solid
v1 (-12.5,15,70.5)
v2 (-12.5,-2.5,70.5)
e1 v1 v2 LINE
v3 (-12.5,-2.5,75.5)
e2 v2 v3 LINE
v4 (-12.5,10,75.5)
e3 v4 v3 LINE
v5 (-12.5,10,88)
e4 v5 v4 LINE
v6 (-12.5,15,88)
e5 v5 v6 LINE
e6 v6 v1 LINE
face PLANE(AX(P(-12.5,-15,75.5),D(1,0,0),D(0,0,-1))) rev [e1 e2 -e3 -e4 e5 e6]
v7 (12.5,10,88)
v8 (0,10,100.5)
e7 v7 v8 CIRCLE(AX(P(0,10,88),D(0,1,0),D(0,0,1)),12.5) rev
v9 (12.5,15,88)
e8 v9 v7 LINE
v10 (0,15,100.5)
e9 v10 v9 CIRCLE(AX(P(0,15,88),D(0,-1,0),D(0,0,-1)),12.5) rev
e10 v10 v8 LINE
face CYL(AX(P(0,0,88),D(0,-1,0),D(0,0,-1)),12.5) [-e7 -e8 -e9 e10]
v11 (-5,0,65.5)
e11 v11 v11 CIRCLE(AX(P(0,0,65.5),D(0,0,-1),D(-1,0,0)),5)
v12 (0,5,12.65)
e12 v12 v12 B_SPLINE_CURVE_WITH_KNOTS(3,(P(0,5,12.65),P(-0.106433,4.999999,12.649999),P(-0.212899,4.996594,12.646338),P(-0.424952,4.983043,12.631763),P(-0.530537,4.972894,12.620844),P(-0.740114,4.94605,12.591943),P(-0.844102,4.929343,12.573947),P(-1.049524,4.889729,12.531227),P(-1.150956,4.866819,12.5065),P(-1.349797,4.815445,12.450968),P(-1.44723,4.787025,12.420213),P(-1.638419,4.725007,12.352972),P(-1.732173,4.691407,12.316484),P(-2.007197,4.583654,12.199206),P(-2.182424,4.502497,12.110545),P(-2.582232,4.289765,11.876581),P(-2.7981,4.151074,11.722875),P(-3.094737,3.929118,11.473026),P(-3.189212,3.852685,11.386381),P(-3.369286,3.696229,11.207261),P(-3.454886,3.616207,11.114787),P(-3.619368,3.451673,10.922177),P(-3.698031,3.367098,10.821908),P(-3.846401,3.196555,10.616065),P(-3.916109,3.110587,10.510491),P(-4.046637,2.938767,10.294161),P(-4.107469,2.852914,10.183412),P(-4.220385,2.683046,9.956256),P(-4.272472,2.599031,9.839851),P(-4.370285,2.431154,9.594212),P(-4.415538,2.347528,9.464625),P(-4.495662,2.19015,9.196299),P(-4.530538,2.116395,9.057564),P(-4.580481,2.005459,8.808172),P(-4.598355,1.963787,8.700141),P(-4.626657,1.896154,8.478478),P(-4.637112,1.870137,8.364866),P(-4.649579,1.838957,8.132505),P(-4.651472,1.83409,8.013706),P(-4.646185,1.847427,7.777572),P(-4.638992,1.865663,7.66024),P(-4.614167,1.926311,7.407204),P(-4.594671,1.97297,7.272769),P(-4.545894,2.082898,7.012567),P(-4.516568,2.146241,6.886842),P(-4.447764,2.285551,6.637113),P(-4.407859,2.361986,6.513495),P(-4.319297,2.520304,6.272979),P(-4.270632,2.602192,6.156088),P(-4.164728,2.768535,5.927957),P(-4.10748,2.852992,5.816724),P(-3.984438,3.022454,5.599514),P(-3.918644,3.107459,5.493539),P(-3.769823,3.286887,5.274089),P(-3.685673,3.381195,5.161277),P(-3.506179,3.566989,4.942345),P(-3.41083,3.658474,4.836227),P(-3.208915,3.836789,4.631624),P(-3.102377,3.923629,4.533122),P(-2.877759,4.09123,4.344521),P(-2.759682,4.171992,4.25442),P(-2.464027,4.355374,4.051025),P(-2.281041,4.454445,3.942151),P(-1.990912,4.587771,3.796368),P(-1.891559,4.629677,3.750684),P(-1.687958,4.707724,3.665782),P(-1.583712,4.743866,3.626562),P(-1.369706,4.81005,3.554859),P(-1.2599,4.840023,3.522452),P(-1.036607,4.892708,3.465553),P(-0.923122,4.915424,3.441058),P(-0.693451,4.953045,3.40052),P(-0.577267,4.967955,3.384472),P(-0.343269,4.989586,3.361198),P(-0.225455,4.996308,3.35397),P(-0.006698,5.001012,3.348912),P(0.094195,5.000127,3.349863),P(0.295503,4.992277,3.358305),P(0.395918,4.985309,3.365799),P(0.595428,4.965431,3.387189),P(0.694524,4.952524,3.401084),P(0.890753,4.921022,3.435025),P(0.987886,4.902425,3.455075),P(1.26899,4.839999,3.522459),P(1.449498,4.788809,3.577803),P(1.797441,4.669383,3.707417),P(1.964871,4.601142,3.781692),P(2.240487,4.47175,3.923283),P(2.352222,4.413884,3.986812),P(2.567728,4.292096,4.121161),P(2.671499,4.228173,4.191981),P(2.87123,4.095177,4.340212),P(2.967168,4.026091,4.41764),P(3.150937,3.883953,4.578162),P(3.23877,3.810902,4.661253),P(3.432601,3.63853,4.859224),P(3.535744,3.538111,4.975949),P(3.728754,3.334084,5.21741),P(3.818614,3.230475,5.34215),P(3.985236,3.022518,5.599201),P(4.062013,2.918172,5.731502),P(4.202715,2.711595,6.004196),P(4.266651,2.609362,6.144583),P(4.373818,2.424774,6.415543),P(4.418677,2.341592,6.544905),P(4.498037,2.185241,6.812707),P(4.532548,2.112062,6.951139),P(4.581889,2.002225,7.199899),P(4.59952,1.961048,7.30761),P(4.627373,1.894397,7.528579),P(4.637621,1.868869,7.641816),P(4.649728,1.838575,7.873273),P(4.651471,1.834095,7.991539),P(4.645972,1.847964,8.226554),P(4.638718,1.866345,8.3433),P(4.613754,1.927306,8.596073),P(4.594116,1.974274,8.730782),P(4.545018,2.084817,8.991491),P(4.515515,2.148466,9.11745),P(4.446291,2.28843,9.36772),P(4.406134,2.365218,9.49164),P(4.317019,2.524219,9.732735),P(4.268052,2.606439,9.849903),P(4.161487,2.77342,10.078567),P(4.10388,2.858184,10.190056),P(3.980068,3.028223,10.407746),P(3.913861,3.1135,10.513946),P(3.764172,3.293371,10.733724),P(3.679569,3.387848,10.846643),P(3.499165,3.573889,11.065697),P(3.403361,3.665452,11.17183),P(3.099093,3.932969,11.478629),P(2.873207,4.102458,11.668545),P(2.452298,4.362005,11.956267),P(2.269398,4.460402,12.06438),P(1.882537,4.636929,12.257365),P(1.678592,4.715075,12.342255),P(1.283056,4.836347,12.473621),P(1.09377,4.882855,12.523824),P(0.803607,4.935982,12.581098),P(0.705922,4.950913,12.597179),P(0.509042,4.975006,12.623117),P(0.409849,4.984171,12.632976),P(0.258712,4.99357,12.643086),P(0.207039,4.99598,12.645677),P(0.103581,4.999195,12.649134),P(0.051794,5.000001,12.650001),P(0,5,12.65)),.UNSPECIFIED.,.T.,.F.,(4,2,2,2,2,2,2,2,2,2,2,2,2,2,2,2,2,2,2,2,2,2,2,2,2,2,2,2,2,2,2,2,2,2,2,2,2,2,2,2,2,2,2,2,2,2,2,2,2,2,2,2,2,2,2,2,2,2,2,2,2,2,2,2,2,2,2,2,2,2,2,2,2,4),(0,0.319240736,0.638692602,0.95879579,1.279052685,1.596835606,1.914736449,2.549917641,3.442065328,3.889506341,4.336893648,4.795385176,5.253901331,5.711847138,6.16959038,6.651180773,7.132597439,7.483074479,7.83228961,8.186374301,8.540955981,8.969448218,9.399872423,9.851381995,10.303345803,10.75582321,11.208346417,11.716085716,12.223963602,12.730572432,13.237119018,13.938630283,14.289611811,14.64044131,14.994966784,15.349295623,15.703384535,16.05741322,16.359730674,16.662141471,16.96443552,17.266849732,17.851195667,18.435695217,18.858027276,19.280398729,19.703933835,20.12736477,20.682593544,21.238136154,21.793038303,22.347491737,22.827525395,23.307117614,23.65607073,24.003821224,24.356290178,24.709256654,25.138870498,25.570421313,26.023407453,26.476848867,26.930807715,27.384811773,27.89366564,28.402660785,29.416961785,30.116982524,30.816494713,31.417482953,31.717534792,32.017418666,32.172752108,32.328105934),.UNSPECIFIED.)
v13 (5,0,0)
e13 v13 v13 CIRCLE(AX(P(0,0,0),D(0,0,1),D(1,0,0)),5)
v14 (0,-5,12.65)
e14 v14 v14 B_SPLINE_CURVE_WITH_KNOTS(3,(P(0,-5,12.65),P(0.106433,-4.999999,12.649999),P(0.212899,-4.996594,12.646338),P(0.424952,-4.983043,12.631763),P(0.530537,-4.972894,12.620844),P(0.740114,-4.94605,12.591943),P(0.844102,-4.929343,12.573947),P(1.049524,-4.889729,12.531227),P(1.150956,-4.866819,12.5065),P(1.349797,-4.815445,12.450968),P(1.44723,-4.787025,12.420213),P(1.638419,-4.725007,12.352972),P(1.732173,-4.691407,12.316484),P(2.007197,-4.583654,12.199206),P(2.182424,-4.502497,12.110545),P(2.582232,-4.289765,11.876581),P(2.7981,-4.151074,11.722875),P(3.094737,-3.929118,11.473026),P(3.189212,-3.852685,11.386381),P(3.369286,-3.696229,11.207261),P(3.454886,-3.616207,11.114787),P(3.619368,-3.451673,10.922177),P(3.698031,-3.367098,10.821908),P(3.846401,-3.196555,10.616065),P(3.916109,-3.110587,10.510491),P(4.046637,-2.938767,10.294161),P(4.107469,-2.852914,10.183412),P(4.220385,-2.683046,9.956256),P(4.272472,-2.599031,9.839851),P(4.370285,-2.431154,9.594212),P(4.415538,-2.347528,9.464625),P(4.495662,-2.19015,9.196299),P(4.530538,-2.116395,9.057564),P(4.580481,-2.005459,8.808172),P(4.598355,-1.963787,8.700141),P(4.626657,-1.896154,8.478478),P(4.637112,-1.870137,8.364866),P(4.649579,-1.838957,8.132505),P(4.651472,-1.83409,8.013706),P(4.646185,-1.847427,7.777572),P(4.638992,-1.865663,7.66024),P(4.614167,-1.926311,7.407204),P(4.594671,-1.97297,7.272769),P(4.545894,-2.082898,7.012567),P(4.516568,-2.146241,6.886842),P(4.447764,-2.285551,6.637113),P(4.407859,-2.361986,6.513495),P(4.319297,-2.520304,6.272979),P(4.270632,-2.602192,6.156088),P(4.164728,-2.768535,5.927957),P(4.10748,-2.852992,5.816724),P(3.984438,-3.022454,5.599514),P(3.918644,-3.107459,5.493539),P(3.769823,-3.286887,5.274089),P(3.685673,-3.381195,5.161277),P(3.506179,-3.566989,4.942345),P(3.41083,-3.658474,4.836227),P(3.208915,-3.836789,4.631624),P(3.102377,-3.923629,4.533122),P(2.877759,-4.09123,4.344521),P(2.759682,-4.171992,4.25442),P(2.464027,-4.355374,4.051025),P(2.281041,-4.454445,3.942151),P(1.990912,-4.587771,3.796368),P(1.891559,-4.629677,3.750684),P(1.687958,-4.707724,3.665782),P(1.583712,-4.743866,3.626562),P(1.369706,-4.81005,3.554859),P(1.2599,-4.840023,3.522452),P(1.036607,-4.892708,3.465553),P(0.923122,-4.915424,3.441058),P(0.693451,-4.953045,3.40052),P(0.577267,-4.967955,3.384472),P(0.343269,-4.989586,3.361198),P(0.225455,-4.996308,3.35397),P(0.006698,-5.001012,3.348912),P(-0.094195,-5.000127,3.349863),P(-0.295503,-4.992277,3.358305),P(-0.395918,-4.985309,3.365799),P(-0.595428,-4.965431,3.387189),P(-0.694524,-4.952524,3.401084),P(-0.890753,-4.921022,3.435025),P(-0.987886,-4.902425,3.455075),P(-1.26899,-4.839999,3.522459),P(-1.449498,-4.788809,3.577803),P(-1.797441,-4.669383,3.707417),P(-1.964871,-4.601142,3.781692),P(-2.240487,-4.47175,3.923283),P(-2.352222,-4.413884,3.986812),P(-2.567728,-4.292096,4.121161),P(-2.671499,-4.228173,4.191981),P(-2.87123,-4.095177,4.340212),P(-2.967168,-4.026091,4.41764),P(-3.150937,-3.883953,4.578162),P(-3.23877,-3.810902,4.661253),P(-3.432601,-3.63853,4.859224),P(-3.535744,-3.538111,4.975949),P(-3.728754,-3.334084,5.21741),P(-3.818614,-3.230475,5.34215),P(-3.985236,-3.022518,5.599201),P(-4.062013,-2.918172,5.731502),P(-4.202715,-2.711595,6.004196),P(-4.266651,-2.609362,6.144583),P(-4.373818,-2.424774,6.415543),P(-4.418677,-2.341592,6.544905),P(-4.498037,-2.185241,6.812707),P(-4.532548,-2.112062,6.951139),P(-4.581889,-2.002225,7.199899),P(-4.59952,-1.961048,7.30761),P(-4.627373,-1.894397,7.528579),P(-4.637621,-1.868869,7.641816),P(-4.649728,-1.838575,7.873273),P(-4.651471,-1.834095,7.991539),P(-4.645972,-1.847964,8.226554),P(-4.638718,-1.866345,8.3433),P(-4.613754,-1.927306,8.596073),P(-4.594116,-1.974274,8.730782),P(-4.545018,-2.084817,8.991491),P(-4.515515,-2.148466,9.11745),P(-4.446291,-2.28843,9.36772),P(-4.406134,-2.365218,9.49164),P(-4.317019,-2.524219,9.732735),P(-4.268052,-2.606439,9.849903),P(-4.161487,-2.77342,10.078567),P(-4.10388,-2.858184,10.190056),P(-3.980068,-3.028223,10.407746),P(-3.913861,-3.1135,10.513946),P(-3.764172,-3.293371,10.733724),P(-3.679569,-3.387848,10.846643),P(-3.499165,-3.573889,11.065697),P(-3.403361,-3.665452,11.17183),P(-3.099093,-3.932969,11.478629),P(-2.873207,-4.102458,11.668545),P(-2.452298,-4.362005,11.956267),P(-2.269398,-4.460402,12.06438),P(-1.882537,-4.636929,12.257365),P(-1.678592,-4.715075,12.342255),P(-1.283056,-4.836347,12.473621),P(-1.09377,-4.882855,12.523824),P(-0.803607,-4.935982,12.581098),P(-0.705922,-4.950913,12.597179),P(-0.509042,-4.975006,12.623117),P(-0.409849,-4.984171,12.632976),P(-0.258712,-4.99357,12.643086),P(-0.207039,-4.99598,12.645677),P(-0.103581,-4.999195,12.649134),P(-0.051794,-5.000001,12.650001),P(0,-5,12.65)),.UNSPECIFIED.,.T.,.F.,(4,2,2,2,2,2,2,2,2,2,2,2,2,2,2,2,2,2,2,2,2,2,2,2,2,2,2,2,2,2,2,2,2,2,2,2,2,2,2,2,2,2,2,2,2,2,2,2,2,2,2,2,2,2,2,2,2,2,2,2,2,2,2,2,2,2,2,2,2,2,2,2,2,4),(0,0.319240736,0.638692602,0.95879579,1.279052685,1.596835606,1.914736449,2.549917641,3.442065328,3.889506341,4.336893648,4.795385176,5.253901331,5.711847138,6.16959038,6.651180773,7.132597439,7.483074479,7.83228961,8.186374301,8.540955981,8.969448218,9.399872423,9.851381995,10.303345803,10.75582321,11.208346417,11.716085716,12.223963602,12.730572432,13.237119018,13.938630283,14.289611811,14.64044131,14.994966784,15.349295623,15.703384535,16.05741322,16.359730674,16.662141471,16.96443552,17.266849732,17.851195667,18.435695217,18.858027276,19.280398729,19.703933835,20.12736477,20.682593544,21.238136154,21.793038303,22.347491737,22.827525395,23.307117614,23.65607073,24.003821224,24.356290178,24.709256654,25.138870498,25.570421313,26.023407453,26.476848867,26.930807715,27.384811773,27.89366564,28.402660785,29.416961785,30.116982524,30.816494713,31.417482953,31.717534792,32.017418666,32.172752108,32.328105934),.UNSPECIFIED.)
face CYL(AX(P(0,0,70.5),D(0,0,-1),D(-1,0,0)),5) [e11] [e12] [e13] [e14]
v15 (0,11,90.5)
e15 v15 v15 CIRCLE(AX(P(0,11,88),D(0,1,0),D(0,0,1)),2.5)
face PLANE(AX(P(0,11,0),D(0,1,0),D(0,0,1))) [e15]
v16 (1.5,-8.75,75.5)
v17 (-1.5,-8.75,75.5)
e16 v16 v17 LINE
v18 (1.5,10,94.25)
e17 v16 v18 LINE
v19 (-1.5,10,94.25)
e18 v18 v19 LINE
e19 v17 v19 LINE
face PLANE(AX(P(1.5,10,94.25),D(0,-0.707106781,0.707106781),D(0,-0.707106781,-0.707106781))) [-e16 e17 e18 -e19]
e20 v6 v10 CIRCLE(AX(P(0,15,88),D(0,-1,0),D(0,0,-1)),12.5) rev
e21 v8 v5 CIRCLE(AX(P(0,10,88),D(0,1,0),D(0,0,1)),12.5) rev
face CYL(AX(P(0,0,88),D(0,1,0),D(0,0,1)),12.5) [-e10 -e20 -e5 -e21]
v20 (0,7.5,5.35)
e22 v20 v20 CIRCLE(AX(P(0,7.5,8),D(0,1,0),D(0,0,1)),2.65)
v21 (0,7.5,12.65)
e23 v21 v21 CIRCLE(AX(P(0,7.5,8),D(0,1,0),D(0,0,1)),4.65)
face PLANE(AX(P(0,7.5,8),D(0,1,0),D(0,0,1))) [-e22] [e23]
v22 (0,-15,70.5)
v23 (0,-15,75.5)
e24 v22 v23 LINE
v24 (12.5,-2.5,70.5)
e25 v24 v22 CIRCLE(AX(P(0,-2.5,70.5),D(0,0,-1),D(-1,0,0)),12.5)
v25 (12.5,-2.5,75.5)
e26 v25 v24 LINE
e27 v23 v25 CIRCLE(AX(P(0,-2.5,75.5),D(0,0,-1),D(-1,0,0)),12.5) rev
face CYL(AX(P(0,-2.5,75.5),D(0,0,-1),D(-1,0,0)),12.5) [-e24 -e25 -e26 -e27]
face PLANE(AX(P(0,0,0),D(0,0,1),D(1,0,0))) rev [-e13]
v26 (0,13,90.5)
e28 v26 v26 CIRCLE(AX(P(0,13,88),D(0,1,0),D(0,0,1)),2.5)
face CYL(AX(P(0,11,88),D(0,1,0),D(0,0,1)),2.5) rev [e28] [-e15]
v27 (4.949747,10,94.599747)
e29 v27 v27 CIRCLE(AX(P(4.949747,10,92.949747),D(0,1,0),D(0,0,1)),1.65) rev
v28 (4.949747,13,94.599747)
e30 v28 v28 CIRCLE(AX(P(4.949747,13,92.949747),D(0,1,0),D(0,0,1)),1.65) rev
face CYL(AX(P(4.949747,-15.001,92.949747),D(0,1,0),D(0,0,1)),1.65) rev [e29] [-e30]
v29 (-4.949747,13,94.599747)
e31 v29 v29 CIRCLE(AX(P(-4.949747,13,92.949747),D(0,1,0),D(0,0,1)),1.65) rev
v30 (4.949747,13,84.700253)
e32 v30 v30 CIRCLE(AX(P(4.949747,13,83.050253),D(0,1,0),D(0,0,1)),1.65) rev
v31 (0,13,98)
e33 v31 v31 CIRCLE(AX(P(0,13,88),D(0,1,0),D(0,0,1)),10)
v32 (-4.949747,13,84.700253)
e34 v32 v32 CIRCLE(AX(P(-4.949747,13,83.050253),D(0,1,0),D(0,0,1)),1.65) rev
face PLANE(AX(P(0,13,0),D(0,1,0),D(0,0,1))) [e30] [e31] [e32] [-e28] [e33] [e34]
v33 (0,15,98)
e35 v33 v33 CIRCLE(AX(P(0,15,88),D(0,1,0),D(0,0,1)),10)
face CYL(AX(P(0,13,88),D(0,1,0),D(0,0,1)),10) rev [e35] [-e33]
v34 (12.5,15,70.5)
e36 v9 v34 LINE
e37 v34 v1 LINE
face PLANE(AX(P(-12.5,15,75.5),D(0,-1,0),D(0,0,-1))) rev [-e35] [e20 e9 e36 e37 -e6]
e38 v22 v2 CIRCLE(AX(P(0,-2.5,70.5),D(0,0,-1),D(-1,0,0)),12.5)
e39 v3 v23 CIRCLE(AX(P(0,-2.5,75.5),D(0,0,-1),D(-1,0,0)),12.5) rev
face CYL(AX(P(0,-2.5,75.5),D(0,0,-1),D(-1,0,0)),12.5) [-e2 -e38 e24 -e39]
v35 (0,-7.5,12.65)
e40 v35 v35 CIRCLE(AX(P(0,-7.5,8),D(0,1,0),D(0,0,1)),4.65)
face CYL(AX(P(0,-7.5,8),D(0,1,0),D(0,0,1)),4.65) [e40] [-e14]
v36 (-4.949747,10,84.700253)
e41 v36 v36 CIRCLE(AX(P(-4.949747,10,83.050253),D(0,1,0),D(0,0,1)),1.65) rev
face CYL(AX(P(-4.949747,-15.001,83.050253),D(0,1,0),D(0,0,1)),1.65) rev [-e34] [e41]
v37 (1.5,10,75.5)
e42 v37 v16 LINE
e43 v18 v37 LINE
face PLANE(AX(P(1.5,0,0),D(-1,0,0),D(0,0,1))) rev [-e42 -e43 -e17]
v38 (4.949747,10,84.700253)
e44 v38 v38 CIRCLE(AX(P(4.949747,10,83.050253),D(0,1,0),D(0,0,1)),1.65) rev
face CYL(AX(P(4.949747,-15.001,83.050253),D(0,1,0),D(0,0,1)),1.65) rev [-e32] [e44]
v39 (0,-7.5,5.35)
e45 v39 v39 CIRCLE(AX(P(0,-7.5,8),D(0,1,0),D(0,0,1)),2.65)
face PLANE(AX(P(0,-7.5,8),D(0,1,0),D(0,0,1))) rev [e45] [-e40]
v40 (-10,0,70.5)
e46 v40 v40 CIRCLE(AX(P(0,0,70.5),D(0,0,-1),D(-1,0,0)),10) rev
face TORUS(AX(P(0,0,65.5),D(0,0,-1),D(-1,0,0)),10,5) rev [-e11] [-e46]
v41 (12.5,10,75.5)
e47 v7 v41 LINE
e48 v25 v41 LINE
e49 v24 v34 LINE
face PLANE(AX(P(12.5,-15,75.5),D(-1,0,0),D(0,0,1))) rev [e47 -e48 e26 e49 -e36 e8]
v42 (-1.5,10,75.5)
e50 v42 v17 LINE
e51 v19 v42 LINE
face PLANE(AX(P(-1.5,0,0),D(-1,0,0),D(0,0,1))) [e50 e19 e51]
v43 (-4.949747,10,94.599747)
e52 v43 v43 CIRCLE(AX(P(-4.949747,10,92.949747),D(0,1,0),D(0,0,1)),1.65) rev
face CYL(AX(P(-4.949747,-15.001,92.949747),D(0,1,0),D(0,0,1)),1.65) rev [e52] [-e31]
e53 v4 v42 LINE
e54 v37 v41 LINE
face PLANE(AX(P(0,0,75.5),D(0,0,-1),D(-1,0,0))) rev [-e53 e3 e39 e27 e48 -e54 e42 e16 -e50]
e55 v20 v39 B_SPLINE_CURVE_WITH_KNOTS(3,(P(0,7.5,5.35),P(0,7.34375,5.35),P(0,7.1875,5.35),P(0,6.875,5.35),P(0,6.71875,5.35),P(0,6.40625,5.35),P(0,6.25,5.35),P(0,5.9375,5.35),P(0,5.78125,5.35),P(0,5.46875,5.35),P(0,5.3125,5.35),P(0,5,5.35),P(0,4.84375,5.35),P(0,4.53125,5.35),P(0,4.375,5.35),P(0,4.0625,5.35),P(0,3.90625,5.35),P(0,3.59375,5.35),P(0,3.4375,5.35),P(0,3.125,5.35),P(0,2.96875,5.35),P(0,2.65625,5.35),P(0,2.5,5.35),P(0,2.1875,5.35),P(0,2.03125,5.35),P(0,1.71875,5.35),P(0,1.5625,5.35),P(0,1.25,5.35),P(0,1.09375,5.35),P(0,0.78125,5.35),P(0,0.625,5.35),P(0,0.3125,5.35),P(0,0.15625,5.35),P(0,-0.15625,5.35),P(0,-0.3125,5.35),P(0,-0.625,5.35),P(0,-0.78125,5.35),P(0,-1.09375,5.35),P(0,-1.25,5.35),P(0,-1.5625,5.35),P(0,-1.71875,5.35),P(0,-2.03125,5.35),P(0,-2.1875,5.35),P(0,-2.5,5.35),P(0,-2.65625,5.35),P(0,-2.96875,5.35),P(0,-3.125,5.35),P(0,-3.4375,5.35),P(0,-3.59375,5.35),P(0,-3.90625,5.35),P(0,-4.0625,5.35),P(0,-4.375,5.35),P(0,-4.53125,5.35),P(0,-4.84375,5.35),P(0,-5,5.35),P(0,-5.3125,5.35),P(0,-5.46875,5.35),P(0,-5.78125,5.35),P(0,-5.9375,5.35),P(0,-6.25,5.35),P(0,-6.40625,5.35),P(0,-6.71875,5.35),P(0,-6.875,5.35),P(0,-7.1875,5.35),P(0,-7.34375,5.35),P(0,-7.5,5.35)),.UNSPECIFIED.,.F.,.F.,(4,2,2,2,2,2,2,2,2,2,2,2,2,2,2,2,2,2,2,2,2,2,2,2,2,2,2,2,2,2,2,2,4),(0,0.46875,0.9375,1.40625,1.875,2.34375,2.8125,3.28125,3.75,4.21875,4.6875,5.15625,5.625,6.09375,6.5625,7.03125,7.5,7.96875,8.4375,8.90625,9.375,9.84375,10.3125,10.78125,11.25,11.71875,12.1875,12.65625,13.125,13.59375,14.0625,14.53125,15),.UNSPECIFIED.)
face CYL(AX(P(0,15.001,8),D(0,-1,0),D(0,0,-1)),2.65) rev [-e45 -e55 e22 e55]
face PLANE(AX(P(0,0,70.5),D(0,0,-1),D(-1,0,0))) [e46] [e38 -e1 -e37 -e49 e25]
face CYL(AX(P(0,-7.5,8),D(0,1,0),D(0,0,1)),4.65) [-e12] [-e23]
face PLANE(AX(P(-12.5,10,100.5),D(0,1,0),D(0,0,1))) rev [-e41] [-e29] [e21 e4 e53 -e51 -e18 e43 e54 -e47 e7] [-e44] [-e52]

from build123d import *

# Parameters (mm, degrees)
SKETCH1_R                           = 5
BOSS_EXTRUDE1_DEPTH                 = 70.5
SKETCH3_W                           = 25
SKETCH3_H                           = 30
BOSS_EXTRUDE3_DEPTH                 = 5
SKETCH4_W                           = 25
SKETCH4_H                           = 5
BOSS_EXTRUDE4_DEPTH                 = 25
FILLET3_R                           = 12.5
CUT_EXTRUDE1_REACH                  = 107.624
SKETCH6_R                           = 1.65
SKETCH6_3_R                         = 10
SKETCH6_3_R_2                       = 1.65
SKETCH6_3_R_3                       = 2.5
CUT_EXTRUDE2_DEPTH                  = 2
SKETCH6_4_R                         = 2.5
CUT_EXTRUDE3_DEPTH                  = 4
FILLET4_R                           = 5
CUT_EXTRUDE4_REACH                  = 104.379
CUT_EXTRUDE4_END_RADIUS             = 5
SKETCH7_R                           = 2.65
CUT_EXTRUDE4_DIRECTION_2_REACH      = 104.379
CUT_EXTRUDE4_DIRECTION_2_END_RADIUS = 5
BOSS_EXTRUDE6_DEPTH                 = 7.5
BOSS_EXTRUDE6_DEPTH_BACK            = 7.5
SKETCH7_3_R                         = 4.65
SKETCH7_3_R_2                       = 2.65
BOSS_EXTRUDE7_DEPTH                 = 1.5
BOSS_EXTRUDE7_DEPTH_BACK            = 1.5


with BuildPart() as part:
    # Sketch1 → Boss-Extrude1 (new body)
    with BuildSketch(Plane(origin=(0, 0, 0), x_dir=(0, 1, 0), z_dir=(0, 0, 1))):
        with Locations(Location((0, 0, 0), (0, 0, 270))):
            Circle(SKETCH1_R)
    extrude(amount=BOSS_EXTRUDE1_DEPTH)

    # Sketch3 → Boss-Extrude3 (add)
    with BuildSketch(Plane.XY.offset(70.5)):
        Rectangle(SKETCH3_W, SKETCH3_H)
    extrude(amount=BOSS_EXTRUDE3_DEPTH)

    # Sketch4 → Boss-Extrude4 (add)
    with BuildSketch(Plane.XY.offset(75.5)):
        with Locations((0, 12.5)):
            Rectangle(SKETCH4_W, SKETCH4_H)
    extrude(amount=BOSS_EXTRUDE4_DEPTH)

    # Fillet3
    fillet3_edges = [part.edges().sort_by_distance(p)[0] for p in [
        (12.5, 12.5, 100.5),
        (-12.5, 12.5, 100.5),
        (-12.5, -15, 73),
        (12.5, -15, 73),
    ]]
    fillet(fillet3_edges, radius=FILLET3_R - 0.0001)  # a hair under: the kernel refuses the full size

    # Sketch6 → Cut-Extrude1 (cut, up to next)
    with BuildSketch(Plane(origin=(0, 15, 0), x_dir=(-1, 0, 0), z_dir=(0, 1, 0)), mode=Mode.PRIVATE) as cut_extrude1_sk1:
        with Locations(Location((-4.949747468, 92.949747468, 0), (0, 0, 90))):
            Circle(SKETCH6_R)
    cut_extrude1_tool1 = extrude(cut_extrude1_sk1.sketch, amount=-CUT_EXTRUDE1_REACH, mode=Mode.PRIVATE) & part.part
    # Sketch6 → Cut-Extrude1 (cut, up to next)
    with BuildSketch(Plane(origin=(0, 15, 0), x_dir=(-1, 0, 0), z_dir=(0, 1, 0)), mode=Mode.PRIVATE) as cut_extrude1_sk2:
        with Locations(Location((4.949747468, 92.949747468, 0), (0, 0, 90))):
            Circle(SKETCH6_R)
    cut_extrude1_tool2 = extrude(cut_extrude1_sk2.sketch, amount=-CUT_EXTRUDE1_REACH, mode=Mode.PRIVATE) & part.part
    # Sketch6 → Cut-Extrude1 (cut, up to next)
    with BuildSketch(Plane(origin=(0, 15, 0), x_dir=(-1, 0, 0), z_dir=(0, 1, 0)), mode=Mode.PRIVATE) as cut_extrude1_sk3:
        with Locations(Location((-4.949747468, 83.050252532, 0), (0, 0, 90))):
            Circle(SKETCH6_R)
    cut_extrude1_tool3 = extrude(cut_extrude1_sk3.sketch, amount=-CUT_EXTRUDE1_REACH, mode=Mode.PRIVATE) & part.part
    # Sketch6 → Cut-Extrude1 (cut, up to next)
    with BuildSketch(Plane(origin=(0, 15, 0), x_dir=(-1, 0, 0), z_dir=(0, 1, 0)), mode=Mode.PRIVATE) as cut_extrude1_sk4:
        with Locations(Location((4.949747468, 83.050252532, 0), (0, 0, 90))):
            Circle(SKETCH6_R)
    cut_extrude1_tool4 = extrude(cut_extrude1_sk4.sketch, amount=-CUT_EXTRUDE1_REACH, mode=Mode.PRIVATE) & part.part
    add(cut_extrude1_tool1.solids().sort_by_distance((4.949747, 15, 92.949747))[0], mode=Mode.SUBTRACT)
    add(cut_extrude1_tool2.solids().sort_by_distance((-4.949747, 15, 92.949747))[0], mode=Mode.SUBTRACT)
    add(cut_extrude1_tool3.solids().sort_by_distance((4.949747, 15, 83.050253))[0], mode=Mode.SUBTRACT)
    add(cut_extrude1_tool4.solids().sort_by_distance((-4.949747, 15, 83.050253))[0], mode=Mode.SUBTRACT)

    # Sketch6<3> → Cut-Extrude2 (cut)
    # profile 1 of 6: a face of its own
    with BuildSketch(Plane(origin=(0, 15, 0), x_dir=(-1, 0, 0), z_dir=(0, 1, 0))):
        with Locations(Location((0, 88, 0), (0, 0, 90))):
            Circle(SKETCH6_3_R)
        with Locations(Location((4.949747468, 83.050252532, 0), (0, 0, 90))):
            Circle(SKETCH6_3_R_2, mode=Mode.SUBTRACT)
        with Locations(Location((-4.949747468, 83.050252532, 0), (0, 0, 90))):
            Circle(SKETCH6_3_R_2, mode=Mode.SUBTRACT)
        with Locations(Location((4.949747468, 92.949747468, 0), (0, 0, 90))):
            Circle(SKETCH6_3_R_2, mode=Mode.SUBTRACT)
        with Locations(Location((-4.949747468, 92.949747468, 0), (0, 0, 90))):
            Circle(SKETCH6_3_R_2, mode=Mode.SUBTRACT)
        with Locations((0, 88)):
            Circle(SKETCH6_3_R_3, mode=Mode.SUBTRACT)
    # profile 2 of 6: a face of its own
    with BuildSketch(Plane(origin=(0, 15, 0), x_dir=(-1, 0, 0), z_dir=(0, 1, 0))):
        with Locations(Location((4.949747468, 92.949747468, 0), (0, 0, 90))):
            Circle(SKETCH6_3_R_2)
    # profile 3 of 6: a face of its own
    with BuildSketch(Plane(origin=(0, 15, 0), x_dir=(-1, 0, 0), z_dir=(0, 1, 0))):
        with Locations(Location((-4.949747468, 92.949747468, 0), (0, 0, 90))):
            Circle(SKETCH6_3_R_2)
    # profile 4 of 6: a face of its own
    with BuildSketch(Plane(origin=(0, 15, 0), x_dir=(-1, 0, 0), z_dir=(0, 1, 0))):
        with Locations(Location((-4.949747468, 83.050252532, 0), (0, 0, 90))):
            Circle(SKETCH6_3_R_2)
    # profile 5 of 6: a face of its own
    with BuildSketch(Plane(origin=(0, 15, 0), x_dir=(-1, 0, 0), z_dir=(0, 1, 0))):
        with Locations(Location((4.949747468, 83.050252532, 0), (0, 0, 90))):
            Circle(SKETCH6_3_R_2)
    # profile 6 of 6: a face of its own
    with BuildSketch(Plane(origin=(0, 15, 0), x_dir=(-1, 0, 0), z_dir=(0, 1, 0))):
        with Locations((0, 88)):
            Circle(SKETCH6_3_R_3)
    extrude(amount=-CUT_EXTRUDE2_DEPTH, mode=Mode.SUBTRACT)

    # Sketch6<4> → Cut-Extrude3 (cut)
    with BuildSketch(Plane(origin=(0, 15, 0), x_dir=(-1, 0, 0), z_dir=(0, 1, 0))):
        with Locations(Location((0, 88, 0), (0, 0, 90))):
            Circle(SKETCH6_4_R)
    extrude(amount=-CUT_EXTRUDE3_DEPTH, mode=Mode.SUBTRACT)

    # Fillet4
    fillet4_edges = [part.edges().sort_by_distance(p)[0] for p in [
        (-5, 0, 70.5),
    ]]
    fillet(fillet4_edges, radius=FILLET4_R)

    # Cut-Extrude4: up to this cylinder (the profile starts inside it)
    cut_extrude4_end = Plane(origin=(0, 0, 8), z_dir=(0, 0, -1)) * Cylinder(CUT_EXTRUDE4_END_RADIUS, 219.758, mode=Mode.PRIVATE)
    # Sketch7 → Cut-Extrude4 (cut, up to the surface)
    with BuildSketch(Plane(origin=(0, 0, 0), x_dir=(-1, 0, 0), z_dir=(0, 1, 0)), mode=Mode.PRIVATE) as cut_extrude4_sk1:
        with Locations(Location((0, 8, 0), (0, 0, 270))):
            Circle(SKETCH7_R)
    cut_extrude4_tool1 = extrude(cut_extrude4_sk1.sketch, amount=-CUT_EXTRUDE4_REACH, mode=Mode.PRIVATE) & cut_extrude4_end
    add(cut_extrude4_tool1.solids().sort_by_distance((0, 0, 8))[0], mode=Mode.SUBTRACT)

    # Cut-Extrude4 direction 2: up to this cylinder (the profile starts inside it)
    cut_extrude4_direction_2_end = Plane(origin=(0, 0, 8), z_dir=(0, 0, -1)) * Cylinder(CUT_EXTRUDE4_DIRECTION_2_END_RADIUS, 219.758, mode=Mode.PRIVATE)
    # Sketch7 → Cut-Extrude4 direction 2 (cut, up to the surface)
    with BuildSketch(Plane(origin=(0, 0, 0), x_dir=(-1, 0, 0), z_dir=(0, 1, 0)), mode=Mode.PRIVATE) as cut_extrude4_direction_2_sk1:
        with Locations(Location((0, 8, 0), (0, 0, 270))):
            Circle(SKETCH7_R)
    cut_extrude4_direction_2_tool1 = extrude(cut_extrude4_direction_2_sk1.sketch, amount=CUT_EXTRUDE4_DIRECTION_2_REACH, mode=Mode.PRIVATE) & cut_extrude4_direction_2_end
    add(cut_extrude4_direction_2_tool1.solids().sort_by_distance((0, 0, 8))[0], mode=Mode.SUBTRACT)

    # Sketch7<3> → Boss-Extrude6 (add, two sides: drawn at the far end of the back side and taken through both)
    with BuildSketch(Plane(origin=(0, 0, 0), x_dir=(-1, 0, 0), z_dir=(0, 1, 0)).offset(-BOSS_EXTRUDE6_DEPTH_BACK)):
        with Locations(Location((0, 8, 0), (0, 0, 90))):
            Circle(SKETCH7_3_R)
        with Locations(Location((0, 8, 0), (0, 0, 270))):
            Circle(SKETCH7_3_R_2, mode=Mode.SUBTRACT)
    extrude(amount=BOSS_EXTRUDE6_DEPTH + BOSS_EXTRUDE6_DEPTH_BACK)

    # Sketch9 → Boss-Extrude7 (add, two sides: drawn at the far end of the back side and taken through both)
    with BuildSketch(Plane(origin=(0, 0, 0), x_dir=(0, -1, 0), z_dir=(-1, 0, 0)).offset(-BOSS_EXTRUDE7_DEPTH_BACK)):
        Polygon((-10, 94.25), (8.75, 75.5), (-10, 75.5), align=None)
    extrude(amount=BOSS_EXTRUDE7_DEPTH + BOSS_EXTRUDE7_DEPTH_BACK)


solid = part.part
